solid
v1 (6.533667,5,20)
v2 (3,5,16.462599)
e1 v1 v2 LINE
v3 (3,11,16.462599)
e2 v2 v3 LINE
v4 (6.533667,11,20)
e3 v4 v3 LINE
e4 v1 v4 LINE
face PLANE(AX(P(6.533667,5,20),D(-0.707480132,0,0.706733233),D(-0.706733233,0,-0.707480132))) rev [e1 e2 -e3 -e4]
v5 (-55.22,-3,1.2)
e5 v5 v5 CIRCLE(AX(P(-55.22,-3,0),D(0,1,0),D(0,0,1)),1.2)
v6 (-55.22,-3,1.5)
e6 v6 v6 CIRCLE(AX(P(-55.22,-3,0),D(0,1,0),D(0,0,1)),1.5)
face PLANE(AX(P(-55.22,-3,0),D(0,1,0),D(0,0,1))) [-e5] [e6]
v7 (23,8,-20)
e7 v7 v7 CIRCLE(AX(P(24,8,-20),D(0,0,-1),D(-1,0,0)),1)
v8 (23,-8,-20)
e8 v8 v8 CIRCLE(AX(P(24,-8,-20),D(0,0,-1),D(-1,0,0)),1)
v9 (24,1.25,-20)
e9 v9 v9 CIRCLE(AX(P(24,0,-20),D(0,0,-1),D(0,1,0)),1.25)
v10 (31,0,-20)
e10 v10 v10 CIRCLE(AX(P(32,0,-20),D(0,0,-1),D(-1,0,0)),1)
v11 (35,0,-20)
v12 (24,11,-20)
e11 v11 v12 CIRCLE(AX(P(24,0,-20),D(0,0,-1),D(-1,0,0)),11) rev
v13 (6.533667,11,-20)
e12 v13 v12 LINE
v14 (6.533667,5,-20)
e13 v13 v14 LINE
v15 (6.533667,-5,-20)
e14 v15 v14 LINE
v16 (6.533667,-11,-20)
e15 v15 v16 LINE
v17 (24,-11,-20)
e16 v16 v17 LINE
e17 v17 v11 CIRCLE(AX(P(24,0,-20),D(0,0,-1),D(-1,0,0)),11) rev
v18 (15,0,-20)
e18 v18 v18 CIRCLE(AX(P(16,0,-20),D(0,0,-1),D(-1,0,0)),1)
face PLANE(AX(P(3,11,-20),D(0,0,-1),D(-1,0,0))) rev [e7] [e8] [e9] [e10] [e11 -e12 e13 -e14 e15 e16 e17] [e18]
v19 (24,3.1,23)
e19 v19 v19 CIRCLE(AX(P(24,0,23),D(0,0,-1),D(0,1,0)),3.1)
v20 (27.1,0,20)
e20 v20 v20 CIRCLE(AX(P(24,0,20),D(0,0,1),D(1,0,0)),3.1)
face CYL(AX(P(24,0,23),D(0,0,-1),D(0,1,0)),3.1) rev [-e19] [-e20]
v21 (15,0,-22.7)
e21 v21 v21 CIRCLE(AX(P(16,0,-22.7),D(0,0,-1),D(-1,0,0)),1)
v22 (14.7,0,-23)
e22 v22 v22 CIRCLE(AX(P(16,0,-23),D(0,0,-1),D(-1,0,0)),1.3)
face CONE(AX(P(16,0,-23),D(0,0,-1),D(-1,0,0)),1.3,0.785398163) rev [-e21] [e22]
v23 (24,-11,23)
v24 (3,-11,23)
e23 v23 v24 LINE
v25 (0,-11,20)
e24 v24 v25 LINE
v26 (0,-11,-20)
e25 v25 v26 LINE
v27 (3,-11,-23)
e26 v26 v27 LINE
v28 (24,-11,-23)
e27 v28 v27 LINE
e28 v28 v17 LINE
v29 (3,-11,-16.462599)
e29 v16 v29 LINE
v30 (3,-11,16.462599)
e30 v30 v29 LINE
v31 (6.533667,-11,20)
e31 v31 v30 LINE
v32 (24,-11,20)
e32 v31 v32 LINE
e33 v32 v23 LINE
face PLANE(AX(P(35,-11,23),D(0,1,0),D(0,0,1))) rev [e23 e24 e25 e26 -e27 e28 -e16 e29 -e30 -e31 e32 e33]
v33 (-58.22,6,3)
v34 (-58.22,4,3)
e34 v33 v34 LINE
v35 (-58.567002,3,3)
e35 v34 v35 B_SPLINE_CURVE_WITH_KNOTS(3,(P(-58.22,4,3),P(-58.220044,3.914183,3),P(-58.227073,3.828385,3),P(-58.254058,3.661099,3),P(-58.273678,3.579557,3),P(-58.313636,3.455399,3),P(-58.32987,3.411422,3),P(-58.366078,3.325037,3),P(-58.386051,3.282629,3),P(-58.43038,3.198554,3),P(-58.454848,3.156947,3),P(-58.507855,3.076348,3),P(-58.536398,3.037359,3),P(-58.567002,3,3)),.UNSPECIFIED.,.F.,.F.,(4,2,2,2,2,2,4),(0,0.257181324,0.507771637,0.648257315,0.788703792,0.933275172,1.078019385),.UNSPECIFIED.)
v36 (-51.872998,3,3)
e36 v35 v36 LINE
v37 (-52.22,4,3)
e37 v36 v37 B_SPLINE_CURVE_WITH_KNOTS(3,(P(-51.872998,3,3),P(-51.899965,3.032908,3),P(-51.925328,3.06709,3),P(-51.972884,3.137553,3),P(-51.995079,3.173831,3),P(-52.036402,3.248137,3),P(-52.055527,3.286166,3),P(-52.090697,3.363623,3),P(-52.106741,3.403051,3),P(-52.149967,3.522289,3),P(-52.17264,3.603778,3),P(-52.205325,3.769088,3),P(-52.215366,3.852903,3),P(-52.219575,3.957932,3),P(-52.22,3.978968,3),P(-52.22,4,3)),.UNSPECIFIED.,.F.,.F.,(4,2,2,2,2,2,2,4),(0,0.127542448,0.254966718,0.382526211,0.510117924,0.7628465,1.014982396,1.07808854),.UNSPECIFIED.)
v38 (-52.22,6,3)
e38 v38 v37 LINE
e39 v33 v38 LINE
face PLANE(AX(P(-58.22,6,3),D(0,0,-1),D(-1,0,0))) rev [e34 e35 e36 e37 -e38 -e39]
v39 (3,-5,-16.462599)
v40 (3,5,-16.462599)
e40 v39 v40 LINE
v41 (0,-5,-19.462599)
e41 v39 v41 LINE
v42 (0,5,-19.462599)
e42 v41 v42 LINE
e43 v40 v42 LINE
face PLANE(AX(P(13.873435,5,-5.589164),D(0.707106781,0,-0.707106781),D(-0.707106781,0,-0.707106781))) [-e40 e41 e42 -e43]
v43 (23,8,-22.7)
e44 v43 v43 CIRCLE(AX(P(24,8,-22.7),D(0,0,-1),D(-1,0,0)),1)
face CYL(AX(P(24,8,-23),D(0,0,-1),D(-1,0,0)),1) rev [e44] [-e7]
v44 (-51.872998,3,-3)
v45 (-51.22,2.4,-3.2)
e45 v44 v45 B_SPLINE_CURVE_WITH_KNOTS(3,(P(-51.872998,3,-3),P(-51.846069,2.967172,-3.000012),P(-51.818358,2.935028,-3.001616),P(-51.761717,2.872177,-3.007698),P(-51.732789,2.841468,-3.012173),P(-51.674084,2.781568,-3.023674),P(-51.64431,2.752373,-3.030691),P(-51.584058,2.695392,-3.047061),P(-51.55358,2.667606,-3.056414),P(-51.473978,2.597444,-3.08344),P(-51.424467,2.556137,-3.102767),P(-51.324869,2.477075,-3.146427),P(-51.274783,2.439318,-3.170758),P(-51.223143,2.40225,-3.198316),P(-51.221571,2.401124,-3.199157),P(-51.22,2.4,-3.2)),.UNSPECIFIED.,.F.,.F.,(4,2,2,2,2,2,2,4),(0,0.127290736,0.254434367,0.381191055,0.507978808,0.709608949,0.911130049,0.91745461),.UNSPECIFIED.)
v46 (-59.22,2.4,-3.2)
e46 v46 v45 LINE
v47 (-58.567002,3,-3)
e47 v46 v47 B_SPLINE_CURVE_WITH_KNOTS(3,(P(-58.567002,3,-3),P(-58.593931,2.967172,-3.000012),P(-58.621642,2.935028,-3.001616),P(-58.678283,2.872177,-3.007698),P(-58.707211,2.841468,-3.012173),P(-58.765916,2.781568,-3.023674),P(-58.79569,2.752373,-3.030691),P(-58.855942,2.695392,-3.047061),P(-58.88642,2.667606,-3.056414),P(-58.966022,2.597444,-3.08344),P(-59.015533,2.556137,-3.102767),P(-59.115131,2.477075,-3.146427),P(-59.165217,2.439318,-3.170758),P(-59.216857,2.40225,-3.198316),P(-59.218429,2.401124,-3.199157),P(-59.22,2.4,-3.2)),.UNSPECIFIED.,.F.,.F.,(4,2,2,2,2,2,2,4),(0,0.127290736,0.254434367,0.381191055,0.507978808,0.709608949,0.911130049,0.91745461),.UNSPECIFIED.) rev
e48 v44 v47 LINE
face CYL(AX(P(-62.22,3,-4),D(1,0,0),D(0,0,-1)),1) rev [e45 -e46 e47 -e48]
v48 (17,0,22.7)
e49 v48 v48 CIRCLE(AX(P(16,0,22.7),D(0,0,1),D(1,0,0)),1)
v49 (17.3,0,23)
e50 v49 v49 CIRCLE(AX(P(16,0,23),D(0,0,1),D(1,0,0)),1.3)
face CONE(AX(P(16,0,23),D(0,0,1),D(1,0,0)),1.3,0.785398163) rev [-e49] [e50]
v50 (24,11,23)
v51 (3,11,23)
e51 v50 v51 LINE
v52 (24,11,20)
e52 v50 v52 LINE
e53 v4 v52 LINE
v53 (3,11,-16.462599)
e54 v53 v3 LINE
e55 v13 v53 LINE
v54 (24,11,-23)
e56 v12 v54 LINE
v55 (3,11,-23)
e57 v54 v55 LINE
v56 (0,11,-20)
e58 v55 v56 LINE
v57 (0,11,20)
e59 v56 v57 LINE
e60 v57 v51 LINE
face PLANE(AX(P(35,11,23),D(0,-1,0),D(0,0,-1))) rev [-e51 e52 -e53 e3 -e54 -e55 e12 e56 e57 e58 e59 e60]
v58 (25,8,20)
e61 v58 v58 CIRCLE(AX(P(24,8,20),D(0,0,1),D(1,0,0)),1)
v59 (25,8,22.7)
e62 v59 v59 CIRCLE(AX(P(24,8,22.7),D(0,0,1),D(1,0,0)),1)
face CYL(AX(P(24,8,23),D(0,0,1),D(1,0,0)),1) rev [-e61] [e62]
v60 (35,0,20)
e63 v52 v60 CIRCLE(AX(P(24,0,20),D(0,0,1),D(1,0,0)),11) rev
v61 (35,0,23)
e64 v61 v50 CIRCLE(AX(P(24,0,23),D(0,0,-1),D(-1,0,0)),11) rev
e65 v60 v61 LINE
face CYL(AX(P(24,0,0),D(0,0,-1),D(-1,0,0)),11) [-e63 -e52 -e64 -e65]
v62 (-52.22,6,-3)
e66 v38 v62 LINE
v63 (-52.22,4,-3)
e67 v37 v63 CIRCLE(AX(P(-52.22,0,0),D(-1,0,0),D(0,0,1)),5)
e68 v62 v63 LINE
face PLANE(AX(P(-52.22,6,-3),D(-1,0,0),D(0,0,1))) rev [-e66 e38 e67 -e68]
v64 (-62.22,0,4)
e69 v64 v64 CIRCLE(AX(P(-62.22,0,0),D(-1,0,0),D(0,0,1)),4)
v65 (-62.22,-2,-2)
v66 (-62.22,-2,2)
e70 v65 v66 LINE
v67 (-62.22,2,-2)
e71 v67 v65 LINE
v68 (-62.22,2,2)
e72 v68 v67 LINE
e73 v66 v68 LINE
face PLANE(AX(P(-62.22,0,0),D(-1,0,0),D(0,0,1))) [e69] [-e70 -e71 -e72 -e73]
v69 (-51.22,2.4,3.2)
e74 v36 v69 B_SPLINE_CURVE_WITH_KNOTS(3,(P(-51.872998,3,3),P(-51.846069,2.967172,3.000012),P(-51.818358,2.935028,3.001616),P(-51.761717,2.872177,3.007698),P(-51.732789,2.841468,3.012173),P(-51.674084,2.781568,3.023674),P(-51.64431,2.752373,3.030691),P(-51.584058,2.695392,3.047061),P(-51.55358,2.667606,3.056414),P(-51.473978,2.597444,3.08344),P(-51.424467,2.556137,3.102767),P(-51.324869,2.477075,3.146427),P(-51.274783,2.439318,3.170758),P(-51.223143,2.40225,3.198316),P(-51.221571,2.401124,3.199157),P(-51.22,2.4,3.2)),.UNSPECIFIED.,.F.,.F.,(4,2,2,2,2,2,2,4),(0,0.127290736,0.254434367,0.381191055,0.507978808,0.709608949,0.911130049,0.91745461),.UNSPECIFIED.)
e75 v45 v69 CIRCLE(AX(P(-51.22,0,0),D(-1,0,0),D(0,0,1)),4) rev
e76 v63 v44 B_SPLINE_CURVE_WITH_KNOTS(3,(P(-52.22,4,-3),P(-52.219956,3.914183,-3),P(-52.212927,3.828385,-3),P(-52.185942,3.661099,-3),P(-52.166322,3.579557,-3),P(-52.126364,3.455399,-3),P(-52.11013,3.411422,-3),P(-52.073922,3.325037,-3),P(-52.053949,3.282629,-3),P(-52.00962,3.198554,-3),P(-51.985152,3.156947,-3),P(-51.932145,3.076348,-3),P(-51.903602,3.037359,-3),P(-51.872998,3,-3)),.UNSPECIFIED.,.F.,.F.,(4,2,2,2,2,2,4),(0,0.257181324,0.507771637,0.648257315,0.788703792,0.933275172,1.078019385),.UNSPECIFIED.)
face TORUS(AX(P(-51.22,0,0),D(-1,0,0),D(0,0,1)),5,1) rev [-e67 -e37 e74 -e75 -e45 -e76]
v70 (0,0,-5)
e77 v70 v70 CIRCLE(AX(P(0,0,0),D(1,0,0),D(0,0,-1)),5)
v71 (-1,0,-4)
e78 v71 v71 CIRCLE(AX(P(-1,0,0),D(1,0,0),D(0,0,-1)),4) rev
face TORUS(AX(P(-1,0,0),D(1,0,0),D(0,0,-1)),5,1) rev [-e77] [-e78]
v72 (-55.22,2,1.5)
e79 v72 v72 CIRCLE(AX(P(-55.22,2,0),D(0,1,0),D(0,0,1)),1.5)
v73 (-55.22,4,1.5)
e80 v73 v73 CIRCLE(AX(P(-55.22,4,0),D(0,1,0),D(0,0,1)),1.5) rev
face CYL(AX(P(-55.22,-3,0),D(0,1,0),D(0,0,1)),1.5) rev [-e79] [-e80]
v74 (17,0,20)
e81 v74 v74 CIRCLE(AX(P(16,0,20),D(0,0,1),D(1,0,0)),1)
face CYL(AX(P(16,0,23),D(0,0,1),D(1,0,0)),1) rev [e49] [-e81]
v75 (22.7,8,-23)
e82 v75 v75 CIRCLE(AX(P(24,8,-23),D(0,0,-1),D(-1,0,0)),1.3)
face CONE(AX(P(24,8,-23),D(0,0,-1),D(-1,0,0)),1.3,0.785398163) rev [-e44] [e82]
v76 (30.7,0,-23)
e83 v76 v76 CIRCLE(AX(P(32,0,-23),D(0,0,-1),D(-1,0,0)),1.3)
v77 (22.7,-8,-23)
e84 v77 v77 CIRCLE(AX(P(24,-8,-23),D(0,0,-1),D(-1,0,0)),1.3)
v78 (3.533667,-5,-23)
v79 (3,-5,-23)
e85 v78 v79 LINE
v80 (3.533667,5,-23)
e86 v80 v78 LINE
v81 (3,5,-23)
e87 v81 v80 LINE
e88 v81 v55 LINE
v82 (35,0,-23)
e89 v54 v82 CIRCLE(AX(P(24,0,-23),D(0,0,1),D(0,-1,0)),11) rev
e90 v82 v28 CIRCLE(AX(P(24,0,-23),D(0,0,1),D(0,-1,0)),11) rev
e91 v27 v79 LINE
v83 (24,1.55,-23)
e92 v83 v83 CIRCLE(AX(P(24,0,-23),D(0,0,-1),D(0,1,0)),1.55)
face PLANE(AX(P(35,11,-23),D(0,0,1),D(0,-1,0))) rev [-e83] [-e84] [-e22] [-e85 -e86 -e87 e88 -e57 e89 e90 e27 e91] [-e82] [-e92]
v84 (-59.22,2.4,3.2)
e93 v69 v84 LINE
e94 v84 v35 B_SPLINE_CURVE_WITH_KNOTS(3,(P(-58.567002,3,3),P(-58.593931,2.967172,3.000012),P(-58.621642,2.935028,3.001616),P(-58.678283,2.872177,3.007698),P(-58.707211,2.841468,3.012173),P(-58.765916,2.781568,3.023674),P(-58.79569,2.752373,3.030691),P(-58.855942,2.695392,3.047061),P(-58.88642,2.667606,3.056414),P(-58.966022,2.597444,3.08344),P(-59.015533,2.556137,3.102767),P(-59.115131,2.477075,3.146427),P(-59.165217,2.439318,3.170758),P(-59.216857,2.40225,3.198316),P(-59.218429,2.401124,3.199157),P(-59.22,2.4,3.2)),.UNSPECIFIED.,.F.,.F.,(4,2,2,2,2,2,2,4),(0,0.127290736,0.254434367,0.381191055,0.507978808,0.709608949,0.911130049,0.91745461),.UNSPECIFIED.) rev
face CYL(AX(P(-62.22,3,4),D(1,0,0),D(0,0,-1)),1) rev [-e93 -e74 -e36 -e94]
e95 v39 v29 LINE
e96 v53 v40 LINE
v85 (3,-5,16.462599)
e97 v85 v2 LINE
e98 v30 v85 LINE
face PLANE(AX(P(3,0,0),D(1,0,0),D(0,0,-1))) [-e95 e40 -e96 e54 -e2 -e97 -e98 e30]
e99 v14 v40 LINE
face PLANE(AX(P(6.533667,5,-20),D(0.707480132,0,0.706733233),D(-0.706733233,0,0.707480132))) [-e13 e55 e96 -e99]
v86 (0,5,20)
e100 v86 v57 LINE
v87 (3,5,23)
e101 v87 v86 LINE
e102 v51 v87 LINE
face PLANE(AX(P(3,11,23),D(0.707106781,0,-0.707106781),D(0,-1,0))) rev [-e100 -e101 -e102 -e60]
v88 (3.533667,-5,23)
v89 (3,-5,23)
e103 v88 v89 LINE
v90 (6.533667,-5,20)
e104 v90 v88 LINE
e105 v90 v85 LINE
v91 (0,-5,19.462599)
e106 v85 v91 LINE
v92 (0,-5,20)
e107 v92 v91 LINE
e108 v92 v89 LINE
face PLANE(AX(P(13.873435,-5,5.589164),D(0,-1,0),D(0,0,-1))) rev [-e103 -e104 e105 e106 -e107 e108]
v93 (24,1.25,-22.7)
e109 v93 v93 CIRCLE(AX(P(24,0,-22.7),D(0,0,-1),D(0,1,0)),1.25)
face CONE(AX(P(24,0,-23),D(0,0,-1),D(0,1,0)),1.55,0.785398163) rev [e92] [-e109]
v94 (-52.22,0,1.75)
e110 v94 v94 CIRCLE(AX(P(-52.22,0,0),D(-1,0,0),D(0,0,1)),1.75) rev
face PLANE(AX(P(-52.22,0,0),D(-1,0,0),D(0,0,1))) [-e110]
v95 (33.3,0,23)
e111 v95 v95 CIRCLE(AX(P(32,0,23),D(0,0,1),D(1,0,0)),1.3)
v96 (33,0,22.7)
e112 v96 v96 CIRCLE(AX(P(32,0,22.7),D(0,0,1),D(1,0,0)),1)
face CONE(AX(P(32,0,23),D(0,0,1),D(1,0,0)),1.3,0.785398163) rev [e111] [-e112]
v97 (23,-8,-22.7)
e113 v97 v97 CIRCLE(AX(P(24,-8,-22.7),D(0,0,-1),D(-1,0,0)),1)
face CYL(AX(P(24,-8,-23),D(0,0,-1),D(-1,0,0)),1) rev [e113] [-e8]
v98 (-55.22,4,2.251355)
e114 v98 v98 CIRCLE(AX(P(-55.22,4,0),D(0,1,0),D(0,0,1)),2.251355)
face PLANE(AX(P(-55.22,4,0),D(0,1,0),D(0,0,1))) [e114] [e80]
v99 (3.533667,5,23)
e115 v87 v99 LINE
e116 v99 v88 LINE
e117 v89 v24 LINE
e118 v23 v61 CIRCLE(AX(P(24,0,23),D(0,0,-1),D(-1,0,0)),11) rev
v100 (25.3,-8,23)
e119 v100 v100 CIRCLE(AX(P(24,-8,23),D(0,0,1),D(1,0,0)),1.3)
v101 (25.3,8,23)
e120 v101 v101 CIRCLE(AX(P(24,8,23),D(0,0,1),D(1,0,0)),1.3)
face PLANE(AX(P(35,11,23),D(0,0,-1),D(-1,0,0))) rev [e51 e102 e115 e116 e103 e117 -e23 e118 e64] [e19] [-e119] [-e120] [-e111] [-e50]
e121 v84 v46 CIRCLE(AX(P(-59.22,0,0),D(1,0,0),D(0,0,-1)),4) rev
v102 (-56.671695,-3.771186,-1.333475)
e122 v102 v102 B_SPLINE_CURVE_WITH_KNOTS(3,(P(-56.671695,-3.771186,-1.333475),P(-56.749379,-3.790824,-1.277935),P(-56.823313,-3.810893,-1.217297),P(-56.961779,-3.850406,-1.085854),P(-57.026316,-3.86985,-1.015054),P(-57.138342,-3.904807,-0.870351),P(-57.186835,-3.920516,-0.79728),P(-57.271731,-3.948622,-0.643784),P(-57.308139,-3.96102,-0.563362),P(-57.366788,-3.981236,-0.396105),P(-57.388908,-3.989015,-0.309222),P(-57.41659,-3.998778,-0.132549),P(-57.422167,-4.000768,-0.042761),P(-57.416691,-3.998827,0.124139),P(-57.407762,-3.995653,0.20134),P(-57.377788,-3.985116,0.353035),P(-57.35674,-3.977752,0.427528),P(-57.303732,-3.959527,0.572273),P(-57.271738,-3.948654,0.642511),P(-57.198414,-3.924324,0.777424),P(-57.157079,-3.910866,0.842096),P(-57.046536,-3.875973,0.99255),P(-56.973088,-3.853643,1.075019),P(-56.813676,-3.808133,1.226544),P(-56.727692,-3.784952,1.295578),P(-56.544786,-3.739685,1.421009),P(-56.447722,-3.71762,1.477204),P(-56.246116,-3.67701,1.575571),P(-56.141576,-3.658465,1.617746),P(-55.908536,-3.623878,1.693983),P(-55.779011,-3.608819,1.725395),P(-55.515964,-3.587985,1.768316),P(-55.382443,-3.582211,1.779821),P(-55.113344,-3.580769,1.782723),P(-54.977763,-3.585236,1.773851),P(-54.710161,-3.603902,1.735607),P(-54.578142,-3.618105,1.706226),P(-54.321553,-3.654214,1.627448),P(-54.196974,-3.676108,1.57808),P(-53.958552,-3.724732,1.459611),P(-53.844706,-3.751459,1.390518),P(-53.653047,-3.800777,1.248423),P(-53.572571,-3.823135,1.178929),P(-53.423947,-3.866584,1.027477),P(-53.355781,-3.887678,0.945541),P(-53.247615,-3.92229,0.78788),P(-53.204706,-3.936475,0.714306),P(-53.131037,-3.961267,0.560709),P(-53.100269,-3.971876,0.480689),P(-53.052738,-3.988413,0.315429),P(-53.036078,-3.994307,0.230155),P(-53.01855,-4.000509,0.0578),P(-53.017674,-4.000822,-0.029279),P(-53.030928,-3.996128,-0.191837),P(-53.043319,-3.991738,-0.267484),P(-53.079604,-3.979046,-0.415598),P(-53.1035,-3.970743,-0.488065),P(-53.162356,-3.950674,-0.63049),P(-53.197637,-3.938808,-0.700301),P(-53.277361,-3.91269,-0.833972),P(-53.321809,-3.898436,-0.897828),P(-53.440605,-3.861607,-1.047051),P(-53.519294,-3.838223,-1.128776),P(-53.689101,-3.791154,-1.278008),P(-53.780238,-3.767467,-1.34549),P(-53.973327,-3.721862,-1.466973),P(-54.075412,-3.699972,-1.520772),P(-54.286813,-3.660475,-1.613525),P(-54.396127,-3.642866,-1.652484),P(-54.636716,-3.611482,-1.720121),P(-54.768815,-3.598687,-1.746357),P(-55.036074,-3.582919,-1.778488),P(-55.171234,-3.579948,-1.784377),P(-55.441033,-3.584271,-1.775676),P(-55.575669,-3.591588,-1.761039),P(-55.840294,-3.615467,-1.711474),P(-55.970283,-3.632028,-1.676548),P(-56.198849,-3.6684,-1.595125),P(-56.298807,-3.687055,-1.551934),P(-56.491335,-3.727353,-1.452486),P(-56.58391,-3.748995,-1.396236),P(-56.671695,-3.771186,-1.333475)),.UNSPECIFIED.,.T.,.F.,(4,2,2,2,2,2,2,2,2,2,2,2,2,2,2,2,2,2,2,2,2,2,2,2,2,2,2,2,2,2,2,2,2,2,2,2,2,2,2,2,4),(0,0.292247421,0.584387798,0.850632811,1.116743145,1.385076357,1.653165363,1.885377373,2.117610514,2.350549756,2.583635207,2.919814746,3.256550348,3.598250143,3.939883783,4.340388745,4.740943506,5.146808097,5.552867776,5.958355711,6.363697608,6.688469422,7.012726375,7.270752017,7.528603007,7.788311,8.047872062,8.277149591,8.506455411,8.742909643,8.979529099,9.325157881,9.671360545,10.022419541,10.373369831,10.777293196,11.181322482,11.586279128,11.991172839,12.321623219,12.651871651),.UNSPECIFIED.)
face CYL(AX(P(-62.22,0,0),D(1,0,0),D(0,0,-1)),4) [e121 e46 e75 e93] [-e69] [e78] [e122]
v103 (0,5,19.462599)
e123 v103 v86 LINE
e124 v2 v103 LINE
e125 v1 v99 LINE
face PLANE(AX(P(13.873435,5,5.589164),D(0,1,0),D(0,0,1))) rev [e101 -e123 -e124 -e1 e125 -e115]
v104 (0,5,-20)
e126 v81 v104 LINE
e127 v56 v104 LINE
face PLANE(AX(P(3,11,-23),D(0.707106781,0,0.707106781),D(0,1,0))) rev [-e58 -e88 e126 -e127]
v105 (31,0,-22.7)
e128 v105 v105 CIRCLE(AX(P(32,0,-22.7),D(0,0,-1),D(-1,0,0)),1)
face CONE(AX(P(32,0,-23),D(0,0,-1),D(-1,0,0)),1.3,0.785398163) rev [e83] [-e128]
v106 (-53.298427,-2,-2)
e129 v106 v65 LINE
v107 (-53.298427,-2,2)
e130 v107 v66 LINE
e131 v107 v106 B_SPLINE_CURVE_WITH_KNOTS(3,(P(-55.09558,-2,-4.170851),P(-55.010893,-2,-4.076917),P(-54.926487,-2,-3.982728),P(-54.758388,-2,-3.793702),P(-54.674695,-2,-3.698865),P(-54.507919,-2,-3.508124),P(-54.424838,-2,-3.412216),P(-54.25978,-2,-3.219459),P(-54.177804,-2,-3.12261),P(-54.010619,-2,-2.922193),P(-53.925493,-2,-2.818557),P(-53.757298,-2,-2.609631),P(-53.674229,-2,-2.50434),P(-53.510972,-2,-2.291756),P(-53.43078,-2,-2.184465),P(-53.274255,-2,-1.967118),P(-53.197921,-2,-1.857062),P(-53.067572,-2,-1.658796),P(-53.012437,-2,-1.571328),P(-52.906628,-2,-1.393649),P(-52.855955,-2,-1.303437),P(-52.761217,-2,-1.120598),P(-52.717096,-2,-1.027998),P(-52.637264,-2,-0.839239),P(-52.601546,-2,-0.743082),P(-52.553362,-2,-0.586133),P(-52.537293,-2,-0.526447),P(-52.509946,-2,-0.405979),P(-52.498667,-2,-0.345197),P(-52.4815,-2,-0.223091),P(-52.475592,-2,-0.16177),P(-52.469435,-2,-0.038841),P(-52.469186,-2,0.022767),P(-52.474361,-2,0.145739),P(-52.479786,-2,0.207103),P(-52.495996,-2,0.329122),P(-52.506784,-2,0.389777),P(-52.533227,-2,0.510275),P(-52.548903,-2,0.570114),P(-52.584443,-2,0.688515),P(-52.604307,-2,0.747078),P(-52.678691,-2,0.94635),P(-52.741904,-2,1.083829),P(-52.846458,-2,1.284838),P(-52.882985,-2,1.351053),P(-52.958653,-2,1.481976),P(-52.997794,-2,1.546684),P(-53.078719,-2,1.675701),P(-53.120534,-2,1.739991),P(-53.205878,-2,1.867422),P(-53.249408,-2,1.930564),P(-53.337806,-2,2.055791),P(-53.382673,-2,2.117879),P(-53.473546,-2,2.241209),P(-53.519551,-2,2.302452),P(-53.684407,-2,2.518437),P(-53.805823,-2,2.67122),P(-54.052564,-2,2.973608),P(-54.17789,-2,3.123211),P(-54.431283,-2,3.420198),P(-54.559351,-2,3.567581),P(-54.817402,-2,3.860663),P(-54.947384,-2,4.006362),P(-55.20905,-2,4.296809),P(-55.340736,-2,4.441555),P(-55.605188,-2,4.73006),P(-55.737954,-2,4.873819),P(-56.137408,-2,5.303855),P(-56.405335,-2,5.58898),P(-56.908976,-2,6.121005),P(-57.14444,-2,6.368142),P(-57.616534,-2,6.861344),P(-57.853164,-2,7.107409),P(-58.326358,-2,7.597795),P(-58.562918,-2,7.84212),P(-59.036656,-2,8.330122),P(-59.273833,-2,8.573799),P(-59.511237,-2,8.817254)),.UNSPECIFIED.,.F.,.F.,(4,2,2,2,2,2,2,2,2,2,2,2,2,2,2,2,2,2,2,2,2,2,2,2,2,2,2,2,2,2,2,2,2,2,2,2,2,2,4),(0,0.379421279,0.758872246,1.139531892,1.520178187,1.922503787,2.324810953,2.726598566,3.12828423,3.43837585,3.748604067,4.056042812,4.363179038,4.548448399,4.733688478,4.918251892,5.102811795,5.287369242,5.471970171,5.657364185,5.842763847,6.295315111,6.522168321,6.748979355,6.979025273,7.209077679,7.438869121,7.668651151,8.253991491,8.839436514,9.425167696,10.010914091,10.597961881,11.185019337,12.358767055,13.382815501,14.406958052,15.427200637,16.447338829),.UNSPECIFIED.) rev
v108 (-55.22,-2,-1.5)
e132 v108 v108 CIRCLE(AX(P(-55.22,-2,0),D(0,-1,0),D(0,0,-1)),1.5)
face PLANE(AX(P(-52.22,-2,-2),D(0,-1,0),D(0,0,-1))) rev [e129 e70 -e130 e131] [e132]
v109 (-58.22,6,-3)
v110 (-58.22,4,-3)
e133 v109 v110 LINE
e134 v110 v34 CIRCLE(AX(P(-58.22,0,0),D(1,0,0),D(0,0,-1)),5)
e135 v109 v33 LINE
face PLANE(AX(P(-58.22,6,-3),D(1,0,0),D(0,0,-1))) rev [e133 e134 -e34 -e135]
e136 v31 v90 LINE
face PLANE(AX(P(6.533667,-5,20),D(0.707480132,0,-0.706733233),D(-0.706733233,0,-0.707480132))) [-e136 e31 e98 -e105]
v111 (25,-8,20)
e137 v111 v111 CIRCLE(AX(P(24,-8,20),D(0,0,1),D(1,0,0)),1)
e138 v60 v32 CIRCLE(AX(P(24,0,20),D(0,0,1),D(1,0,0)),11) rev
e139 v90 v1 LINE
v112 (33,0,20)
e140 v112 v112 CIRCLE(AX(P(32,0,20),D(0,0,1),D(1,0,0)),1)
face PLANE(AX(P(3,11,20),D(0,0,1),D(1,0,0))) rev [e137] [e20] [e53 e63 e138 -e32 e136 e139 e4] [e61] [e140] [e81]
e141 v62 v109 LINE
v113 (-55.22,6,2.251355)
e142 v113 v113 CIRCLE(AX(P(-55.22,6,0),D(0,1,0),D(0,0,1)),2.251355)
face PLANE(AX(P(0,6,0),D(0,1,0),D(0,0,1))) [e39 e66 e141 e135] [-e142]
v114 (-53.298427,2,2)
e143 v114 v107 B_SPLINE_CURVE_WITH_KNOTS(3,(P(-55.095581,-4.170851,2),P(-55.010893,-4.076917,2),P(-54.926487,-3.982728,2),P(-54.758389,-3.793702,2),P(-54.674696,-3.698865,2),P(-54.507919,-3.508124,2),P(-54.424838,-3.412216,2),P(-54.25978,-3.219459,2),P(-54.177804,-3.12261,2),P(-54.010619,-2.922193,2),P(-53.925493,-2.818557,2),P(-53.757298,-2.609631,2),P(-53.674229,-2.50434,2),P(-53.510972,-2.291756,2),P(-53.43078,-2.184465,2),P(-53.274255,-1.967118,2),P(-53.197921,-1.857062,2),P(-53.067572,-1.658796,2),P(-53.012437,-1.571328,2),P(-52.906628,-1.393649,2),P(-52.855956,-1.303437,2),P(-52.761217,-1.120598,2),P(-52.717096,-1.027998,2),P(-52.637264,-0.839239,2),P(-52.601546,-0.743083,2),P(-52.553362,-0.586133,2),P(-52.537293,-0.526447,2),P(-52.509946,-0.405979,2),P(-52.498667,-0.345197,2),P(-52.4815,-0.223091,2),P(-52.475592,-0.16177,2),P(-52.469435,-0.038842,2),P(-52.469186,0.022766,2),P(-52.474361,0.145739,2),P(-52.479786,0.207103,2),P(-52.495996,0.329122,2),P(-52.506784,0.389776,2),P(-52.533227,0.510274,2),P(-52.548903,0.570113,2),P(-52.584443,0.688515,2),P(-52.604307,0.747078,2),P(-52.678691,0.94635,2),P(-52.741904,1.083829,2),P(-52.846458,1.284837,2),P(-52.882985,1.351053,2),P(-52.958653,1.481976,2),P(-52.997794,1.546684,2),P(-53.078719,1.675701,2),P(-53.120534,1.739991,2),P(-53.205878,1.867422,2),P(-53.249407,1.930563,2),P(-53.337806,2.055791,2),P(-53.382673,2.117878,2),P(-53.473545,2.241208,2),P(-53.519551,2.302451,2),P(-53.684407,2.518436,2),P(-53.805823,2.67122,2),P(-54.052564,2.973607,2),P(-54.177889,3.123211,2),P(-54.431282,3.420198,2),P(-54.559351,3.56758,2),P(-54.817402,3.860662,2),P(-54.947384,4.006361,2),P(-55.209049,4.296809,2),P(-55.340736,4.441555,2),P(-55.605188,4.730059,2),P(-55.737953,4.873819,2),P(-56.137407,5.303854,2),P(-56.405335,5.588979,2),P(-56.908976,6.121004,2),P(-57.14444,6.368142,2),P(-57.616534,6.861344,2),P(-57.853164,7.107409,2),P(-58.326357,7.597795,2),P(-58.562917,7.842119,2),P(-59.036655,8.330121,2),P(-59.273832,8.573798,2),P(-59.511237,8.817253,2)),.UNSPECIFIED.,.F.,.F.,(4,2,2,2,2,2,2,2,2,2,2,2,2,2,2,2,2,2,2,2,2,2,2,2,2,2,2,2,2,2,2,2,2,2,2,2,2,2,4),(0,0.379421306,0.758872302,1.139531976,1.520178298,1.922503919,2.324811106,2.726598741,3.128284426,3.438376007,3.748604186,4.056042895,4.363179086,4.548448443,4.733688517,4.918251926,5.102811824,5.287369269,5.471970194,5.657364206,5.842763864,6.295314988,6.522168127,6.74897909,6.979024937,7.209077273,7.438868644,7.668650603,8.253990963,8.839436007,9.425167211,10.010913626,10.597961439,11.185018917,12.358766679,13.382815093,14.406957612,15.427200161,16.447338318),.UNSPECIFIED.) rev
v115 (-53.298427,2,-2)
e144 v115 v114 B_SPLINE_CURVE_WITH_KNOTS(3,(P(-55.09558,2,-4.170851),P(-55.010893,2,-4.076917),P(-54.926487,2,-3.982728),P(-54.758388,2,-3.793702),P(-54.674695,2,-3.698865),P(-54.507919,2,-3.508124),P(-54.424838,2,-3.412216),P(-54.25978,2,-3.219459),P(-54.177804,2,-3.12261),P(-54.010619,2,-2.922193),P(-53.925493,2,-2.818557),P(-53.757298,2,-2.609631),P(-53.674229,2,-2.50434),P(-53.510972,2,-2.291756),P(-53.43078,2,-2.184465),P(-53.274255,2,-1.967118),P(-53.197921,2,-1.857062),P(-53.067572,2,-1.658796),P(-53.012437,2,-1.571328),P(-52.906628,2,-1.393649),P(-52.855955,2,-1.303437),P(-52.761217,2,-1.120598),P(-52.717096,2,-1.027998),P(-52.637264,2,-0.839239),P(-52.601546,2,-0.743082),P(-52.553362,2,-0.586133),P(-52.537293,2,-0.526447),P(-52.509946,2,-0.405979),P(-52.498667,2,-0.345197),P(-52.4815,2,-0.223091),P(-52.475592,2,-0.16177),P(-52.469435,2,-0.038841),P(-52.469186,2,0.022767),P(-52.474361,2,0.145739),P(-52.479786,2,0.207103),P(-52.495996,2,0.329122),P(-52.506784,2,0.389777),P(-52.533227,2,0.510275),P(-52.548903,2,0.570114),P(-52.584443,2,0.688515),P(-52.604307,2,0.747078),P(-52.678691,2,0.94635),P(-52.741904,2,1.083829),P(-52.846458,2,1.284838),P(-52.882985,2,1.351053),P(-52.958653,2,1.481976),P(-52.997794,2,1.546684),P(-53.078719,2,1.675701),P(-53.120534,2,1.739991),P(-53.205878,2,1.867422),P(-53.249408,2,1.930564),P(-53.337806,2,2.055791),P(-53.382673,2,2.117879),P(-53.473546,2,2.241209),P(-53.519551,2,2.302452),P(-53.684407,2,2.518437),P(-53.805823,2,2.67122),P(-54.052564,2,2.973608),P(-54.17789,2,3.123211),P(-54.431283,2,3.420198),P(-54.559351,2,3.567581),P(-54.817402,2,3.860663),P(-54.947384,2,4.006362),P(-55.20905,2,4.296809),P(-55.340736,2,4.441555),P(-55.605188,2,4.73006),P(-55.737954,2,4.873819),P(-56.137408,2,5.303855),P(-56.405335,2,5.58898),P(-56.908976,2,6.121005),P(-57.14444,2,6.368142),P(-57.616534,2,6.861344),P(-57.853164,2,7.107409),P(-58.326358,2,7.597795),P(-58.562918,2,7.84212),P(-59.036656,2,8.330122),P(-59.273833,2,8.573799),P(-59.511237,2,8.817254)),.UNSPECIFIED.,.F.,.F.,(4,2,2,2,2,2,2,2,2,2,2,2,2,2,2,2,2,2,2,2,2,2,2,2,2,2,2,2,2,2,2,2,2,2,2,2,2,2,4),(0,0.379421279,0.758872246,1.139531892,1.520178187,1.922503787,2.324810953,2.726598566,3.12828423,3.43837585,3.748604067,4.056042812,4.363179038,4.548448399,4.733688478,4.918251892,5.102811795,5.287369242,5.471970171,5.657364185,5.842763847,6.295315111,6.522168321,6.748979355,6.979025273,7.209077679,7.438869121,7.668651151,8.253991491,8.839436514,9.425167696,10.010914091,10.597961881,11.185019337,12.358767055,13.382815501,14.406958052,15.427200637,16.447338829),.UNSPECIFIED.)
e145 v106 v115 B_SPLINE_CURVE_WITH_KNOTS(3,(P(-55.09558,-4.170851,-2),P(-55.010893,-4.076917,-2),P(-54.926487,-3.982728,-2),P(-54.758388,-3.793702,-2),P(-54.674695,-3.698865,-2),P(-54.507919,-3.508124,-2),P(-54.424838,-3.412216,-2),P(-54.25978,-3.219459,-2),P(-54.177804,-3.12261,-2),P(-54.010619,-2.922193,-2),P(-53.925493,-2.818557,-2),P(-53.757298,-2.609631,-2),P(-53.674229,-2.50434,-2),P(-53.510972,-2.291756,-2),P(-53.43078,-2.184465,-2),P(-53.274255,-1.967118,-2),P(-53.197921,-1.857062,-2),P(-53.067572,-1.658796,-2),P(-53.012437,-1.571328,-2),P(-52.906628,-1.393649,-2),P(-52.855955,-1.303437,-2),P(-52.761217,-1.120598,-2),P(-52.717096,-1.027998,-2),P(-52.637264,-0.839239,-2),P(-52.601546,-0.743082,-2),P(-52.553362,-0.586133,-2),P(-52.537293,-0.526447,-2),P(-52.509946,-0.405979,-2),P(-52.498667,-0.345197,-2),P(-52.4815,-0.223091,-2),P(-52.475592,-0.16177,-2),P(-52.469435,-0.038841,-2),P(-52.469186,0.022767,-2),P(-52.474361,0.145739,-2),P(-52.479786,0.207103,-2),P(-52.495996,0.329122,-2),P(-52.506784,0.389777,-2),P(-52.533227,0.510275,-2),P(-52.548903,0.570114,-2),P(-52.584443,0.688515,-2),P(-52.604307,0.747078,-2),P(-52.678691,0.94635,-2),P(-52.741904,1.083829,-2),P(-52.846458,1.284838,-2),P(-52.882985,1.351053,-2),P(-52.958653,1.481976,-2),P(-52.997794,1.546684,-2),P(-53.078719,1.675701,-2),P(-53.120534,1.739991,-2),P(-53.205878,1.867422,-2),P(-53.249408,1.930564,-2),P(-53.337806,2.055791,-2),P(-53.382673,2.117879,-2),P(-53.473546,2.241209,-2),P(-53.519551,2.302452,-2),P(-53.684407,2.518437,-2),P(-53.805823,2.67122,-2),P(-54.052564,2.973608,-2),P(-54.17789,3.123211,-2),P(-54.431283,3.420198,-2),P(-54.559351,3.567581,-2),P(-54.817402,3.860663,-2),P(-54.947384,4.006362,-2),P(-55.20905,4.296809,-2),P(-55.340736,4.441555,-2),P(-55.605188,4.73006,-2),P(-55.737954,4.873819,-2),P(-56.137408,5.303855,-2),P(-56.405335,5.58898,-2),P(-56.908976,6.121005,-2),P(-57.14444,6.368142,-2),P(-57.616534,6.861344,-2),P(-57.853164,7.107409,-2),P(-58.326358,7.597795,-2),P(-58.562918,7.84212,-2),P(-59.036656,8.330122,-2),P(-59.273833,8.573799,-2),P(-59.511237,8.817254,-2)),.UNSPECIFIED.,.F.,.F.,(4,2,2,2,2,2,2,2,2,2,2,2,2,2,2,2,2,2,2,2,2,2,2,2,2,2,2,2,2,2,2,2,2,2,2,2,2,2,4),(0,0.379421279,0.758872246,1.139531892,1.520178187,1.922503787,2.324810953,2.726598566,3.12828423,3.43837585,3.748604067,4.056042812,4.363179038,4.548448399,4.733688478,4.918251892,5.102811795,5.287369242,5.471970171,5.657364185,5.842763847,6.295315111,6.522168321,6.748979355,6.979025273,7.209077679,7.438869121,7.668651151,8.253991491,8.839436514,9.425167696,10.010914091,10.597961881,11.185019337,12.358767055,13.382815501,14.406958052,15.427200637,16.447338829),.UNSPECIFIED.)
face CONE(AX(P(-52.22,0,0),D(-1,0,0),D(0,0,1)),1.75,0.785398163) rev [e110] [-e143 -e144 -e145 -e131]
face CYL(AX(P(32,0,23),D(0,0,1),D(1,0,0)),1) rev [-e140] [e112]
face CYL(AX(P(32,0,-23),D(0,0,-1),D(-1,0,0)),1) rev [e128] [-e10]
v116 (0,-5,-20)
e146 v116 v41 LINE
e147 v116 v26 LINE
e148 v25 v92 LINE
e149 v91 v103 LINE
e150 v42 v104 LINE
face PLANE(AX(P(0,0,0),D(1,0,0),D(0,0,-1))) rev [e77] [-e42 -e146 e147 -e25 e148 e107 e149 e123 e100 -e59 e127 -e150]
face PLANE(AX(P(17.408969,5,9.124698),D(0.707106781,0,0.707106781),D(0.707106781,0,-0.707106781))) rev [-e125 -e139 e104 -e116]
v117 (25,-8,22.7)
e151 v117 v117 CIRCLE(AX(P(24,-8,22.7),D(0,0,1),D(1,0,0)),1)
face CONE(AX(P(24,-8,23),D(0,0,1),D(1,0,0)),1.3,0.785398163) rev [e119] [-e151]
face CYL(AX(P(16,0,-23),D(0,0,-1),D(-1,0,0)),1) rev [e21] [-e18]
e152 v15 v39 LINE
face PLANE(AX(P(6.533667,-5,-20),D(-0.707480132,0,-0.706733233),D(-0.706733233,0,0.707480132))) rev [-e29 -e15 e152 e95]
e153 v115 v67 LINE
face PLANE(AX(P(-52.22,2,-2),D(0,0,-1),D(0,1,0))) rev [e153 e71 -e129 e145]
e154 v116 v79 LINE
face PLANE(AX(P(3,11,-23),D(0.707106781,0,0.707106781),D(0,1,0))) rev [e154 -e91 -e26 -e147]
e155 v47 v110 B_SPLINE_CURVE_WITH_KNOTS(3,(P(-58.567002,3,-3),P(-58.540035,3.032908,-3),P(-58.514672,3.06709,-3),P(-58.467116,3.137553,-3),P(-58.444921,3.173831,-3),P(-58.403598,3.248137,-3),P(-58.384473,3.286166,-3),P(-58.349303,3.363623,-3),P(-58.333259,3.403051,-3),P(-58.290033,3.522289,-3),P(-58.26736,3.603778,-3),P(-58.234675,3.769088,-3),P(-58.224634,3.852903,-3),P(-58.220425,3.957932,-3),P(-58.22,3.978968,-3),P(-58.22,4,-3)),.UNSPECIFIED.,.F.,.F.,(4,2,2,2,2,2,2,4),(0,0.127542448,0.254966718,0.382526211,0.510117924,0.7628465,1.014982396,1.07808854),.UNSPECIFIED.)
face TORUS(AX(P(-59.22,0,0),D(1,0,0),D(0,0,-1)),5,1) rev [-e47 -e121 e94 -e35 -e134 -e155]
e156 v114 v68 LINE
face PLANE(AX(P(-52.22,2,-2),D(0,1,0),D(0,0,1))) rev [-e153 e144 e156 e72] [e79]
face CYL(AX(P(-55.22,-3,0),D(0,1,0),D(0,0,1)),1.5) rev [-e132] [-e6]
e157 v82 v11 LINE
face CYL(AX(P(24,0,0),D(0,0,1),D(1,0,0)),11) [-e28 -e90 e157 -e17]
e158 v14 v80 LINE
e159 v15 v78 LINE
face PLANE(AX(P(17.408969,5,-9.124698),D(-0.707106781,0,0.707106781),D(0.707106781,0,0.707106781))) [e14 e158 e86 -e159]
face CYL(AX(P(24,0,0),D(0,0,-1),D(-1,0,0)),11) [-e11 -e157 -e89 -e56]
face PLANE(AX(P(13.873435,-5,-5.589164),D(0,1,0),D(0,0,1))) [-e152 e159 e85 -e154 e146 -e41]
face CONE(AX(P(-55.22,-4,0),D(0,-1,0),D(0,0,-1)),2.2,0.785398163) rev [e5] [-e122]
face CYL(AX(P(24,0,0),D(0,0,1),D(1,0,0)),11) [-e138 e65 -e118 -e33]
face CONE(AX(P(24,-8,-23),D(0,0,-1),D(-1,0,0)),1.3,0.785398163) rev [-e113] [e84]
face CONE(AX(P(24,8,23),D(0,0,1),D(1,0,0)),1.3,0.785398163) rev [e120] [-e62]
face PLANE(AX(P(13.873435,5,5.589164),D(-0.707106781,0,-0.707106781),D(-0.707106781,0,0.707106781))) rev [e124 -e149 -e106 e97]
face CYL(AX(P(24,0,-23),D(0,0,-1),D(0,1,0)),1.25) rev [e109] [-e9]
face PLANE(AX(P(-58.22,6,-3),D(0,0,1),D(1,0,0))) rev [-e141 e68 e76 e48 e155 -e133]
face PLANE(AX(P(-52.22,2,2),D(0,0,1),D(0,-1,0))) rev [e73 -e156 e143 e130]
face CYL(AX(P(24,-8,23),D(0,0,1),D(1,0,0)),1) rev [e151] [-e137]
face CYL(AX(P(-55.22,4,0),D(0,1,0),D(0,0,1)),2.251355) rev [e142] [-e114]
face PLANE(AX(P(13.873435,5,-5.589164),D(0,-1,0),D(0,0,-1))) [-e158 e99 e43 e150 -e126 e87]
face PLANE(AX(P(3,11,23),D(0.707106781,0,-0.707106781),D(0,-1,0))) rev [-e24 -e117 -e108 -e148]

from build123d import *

# Parameters (mm, degrees)
IZIM1_W                                        = 46
IZIM1_H                                        = 22
Y_KSEKLIK_EKSTR_ZYON1_DEPTH                    = 35
IZIM2_W                                        = 40
IZIM2_H                                        = 22
KES_EKSTR_ZYON1_DEPTH                          = 32
RADYUS1_R                                      = 11
PAH1_SIZE                                      = 3
IZIM3_W                                        = 5
IZIM3_H                                        = 10
KES_EKSTR_ZYON2_DEPTH                          = 20
FEDER5_REACH                                   = 46.833
IZIM8_WALL_W                                   = 96.666047784
IZIM8_WALL_H                                   = 6
AYNALAMA4_COPY_1_REACH                         = 46.833
AYNALAMA4_COPY_1_SKETCH_W                      = 96.666047784
AYNALAMA4_COPY_1_SKETCH_H                      = 6
IZIM10_R                                       = 3.1
KES_EKSTR_ZYON4_DEPTH                          = 59.838762733
IZIM12_R                                       = 3.1
Y_KSEKLIK_EKSTR_ZYON3_DEPTH                    = 3
M3_D_Z_BA_L_MAKINE_VIDAS_IN_HAV_A1_D           = 2.5
M3_D_Z_BA_L_MAKINE_VIDAS_IN_HAV_A1_CSINK_D     = 3.1
M3_D_Z_BA_L_MAKINE_VIDAS_IN_HAV_A1_CSINK_ANGLE = 90
IZIM18_R                                       = 4
Y_KSEKLIK_EKSTR_ZYON4_DEPTH                    = 62.22
IZIM19_W                                       = 4
IZIM19_H                                       = 4
KES_EKSTR_ZYON5_DEPTH                          = 10
RADYUS2_R                                      = 1
Y_KSEKLIK_EKSTR_ZYON5_DEPTH                    = 2
Y_KSEKLIK_EKSTR_ZYON5_DEPTH_BACK               = 2
IZIM21_W                                       = 6
IZIM21_H                                       = 6
IZIM22_R                                       = 1.5
KES_EKSTR_ZYON6_DEPTH                          = 9
IZIM23_R                                       = 2.251355404
KES_EKSTR_ZYON7_DEPTH                          = 2
RADYUS3_R                                      = 1
M2_D_Z_BA_L_MAKINE_VIDAS_IN_HAV_A2_D           = 2
M2_D_Z_BA_L_MAKINE_VIDAS_IN_HAV_A2_DEPTH       = 46
M2_D_Z_BA_L_MAKINE_VIDAS_IN_HAV_A2_CSINK_D     = 4.4
M2_D_Z_BA_L_MAKINE_VIDAS_IN_HAV_A2_CSINK_ANGLE = 90
M2_D_Z_BA_L_MAKINE_VIDAS_IN_HAV_A2_TIP         = 0.600860619


# Read off the part's stored shape, not the designer's step: M2 Düz Başlı Makine Vidası İçin Havşa1
with BuildPart() as part:
    # Çizim1 → Yükseklik-Ekstrüzyon1 (new body)
    with BuildSketch(Plane(origin=(0, 0, 0), x_dir=(0, 0, -1), z_dir=(1, 0, 0))):
        Rectangle(IZIM1_W, IZIM1_H)
    extrude(amount=Y_KSEKLIK_EKSTR_ZYON1_DEPTH)

    # Çizim2 → Kes-Ekstrüzyon1 (cut)
    with BuildSketch(Plane(origin=(35, 0, 0), x_dir=(0, 0, -1), z_dir=(1, 0, 0))):
        Rectangle(IZIM2_W, IZIM2_H)
    extrude(amount=-KES_EKSTR_ZYON1_DEPTH, mode=Mode.SUBTRACT)

    # Radyus1
    radyus1_edges = [part.edges().sort_by_distance(p)[0] for p in [
        (35, -11, 21.5),
        (35, 11, 21.5),
        (35, -11, -21.5),
        (35, 11, -21.5),
    ]]
    fillet(radyus1_edges, radius=RADYUS1_R - 0.0001)  # a hair under: the kernel refuses the full size

    # Pah1
    pah1_edges = [part.edges().sort_by_distance(p)[0] for p in [
        (0, 0, 23),
        (0, 0, -23),
    ]]
    chamfer(pah1_edges, length=PAH1_SIZE)

    # Çizim3 → Kes-Ekstrüzyon2 (cut)
    with BuildSketch(Plane(origin=(-10, 0, 10), x_dir=(0.7071067811865468, 0, 0.7071067811865483), z_dir=(-0.7071067811865483, 0, 0.7071067811865468))):
        with Locations((16.262135624, 0)):
            Rectangle(IZIM3_W, IZIM3_H)
    kes_ekstr_zyon2 = extrude(amount=-KES_EKSTR_ZYON2_DEPTH, mode=Mode.SUBTRACT)

    # M2 Düz Başlı Makine Vidası İçin Havşa1 ou → M2 Düz Başlı Makine Vidası İçin Havşa1 (revolve, cut)
    with BuildSketch(Plane(origin=(24, -8, 0), x_dir=(1, 0, 0), z_dir=(0, -1, 0))):
        Polygon((0, 20), (1, 20), (1, 22.7), (1.3, 23), (0, 23), align=None)
    m2_d_z_ba_l_makine_vidas_in_hav_a1 = revolve(axis=Axis((24, -8, 0), (0, 0, 1)), mode=Mode.SUBTRACT)

    # M2 D_z Ba_l_ Makine Vidas_ _in Hav_a 2 → M2 D_z Ba_l_ Makine Vidas_ _in Hav_a1 2 (revolve, cut)
    with BuildSketch(Plane(origin=(32, 0, 0), x_dir=(1, 0, 0), z_dir=(0, -1, 0))):
        Polygon((0, 20), (1, 20), (1, 22.7), (1.3, 23), (0, 23), align=None)
    m2_d_z_ba_l_makine_vidas_in_hav_a1_2 = revolve(axis=Axis((32, 0, 0), (0, 0, 1)), mode=Mode.SUBTRACT)

    # M2 D_z Ba_l_ Makine Vidas_ _in Hav_a 3 → M2 D_z Ba_l_ Makine Vidas_ _in Hav_a1 3 (revolve, cut)
    with BuildSketch(Plane(origin=(24, 8, 0), x_dir=(1, 0, 0), z_dir=(0, -1, 0))):
        Polygon((0, 20), (1, 20), (1, 22.7), (1.3, 23), (0, 23), align=None)
    m2_d_z_ba_l_makine_vidas_in_hav_a1_3 = revolve(axis=Axis((24, 8, 0), (0, 0, 1)), mode=Mode.SUBTRACT)

    # M2 D_z Ba_l_ Makine Vidas_ _in Hav_a 4 → M2 D_z Ba_l_ Makine Vidas_ _in Hav_a1 4 (revolve, cut)
    with BuildSketch(Plane(origin=(16, 0, 0), x_dir=(1, 0, 0), z_dir=(0, -1, 0))):
        Polygon((0, 20), (1, 20), (1, 22.7), (1.3, 23), (0, 23), align=None)
    m2_d_z_ba_l_makine_vidas_in_hav_a1_4 = revolve(axis=Axis((16, 0, 0), (0, 0, 1)), mode=Mode.SUBTRACT)

    # Aynalama2: Kes-Ekstrüzyon2, M2 Düz Başlı Makine Vidası İçin Havşa1, M2 D_z Ba_l_ Makine Vidas_ _in Hav_a1 2, M2 D_z Ba_l_ Makine Vidas_ _in Hav_a1 3, M2 D_z Ba_l_ Makine Vidas_ _in Hav_a1 4 across plane
    add(kes_ekstr_zyon2.mirror(Plane.XY), mode=Mode.SUBTRACT)
    add(m2_d_z_ba_l_makine_vidas_in_hav_a1.mirror(Plane.XY), mode=Mode.SUBTRACT)
    add(m2_d_z_ba_l_makine_vidas_in_hav_a1_2.mirror(Plane.XY), mode=Mode.SUBTRACT)
    add(m2_d_z_ba_l_makine_vidas_in_hav_a1_3.mirror(Plane.XY), mode=Mode.SUBTRACT)
    add(m2_d_z_ba_l_makine_vidas_in_hav_a1_4.mirror(Plane.XY), mode=Mode.SUBTRACT)

    # Çizim8 wall → Feder5 (add, up to next)
    with BuildSketch(Plane(origin=(4.766833329, -5, -18.231299423), x_dir=(-0.706733233022, 0, 0.707480132118), z_dir=(0.707480132118, 0, 0.706733233022)), mode=Mode.PRIVATE) as feder5_sk1:
        with Locations((0, 3)):
            Rectangle(IZIM8_WALL_W, IZIM8_WALL_H)
    feder5_tool1 = extrude(feder5_sk1.sketch, amount=-FEDER5_REACH, mode=Mode.PRIVATE) - part.part
    feder5 = feder5_tool1.solids().sort_by_distance((4.766833329, -5, -18.231299423))[0]
    add(feder5)

    # Aynalama3: Feder5 across plane
    add(feder5.mirror(Plane.ZX))

    # Aynalama4: Feder5 across plane
    add(feder5.mirror(Plane.XY))

    # Aynalama4 copy 1 sketch → Aynalama4 copy 1 (add, up to next)
    with BuildSketch(Plane(origin=(4.766833329, 5, 18.231299423), x_dir=(-0.706733233022, 0, -0.707480132118), z_dir=(0.707480132118, 0, -0.706733233022)), mode=Mode.PRIVATE) as aynalama4_copy_1_sk1:
        with Locations((0, 3)):
            Rectangle(AYNALAMA4_COPY_1_SKETCH_W, AYNALAMA4_COPY_1_SKETCH_H)
    aynalama4_copy_1_tool1 = extrude(aynalama4_copy_1_sk1.sketch, amount=-AYNALAMA4_COPY_1_REACH, mode=Mode.PRIVATE) - part.part
    add(aynalama4_copy_1_tool1.solids().sort_by_distance((4.766833329, 5, 18.231299423))[0])

    # Çizim10 → Kes-Ekstrüzyon4 (cut, through all)
    with BuildSketch(Plane(origin=(0, 0, -23), x_dir=(-1, 0, 0), z_dir=(0, 0, -1))):
        with Locations(Location((-24, 0, 0), (0, 0, 90))):
            Circle(IZIM10_R)
    extrude(amount=-KES_EKSTR_ZYON4_DEPTH, mode=Mode.SUBTRACT)

    # Çizim12 → Yükseklik-Ekstrüzyon3 (add)
    with BuildSketch(Plane(origin=(0, 0, -23), x_dir=(-1, 0, 0), z_dir=(0, 0, -1))):
        with Locations(Location((-24, 0, 0), (0, 0, 90))):
            Circle(IZIM12_R)
    extrude(amount=-Y_KSEKLIK_EKSTR_ZYON3_DEPTH)

    # M3 Düz Başlı Makine Vidası İçin Havşa1 (through all)
    with Locations(Plane(origin=(24, 0, -23), x_dir=(0, -1, 0), z_dir=(0, 0, -1))):
        with Locations((0, 0)):
            CounterSinkHole(M3_D_Z_BA_L_MAKINE_VIDAS_IN_HAV_A1_D / 2, M3_D_Z_BA_L_MAKINE_VIDAS_IN_HAV_A1_CSINK_D / 2, counter_sink_angle=M3_D_Z_BA_L_MAKINE_VIDAS_IN_HAV_A1_CSINK_ANGLE)

    # Çizim18 → Yükseklik-Ekstrüzyon4 (add)
    with BuildSketch(Plane.ZY):
        with Locations(Location((0, 0, 0), (0, 0, 180))):
            Circle(IZIM18_R)
    extrude(amount=Y_KSEKLIK_EKSTR_ZYON4_DEPTH)

    # Çizim19 → Kes-Ekstrüzyon5 (cut)
    with BuildSketch(Plane.ZY.offset(62.22)):
        Rectangle(IZIM19_W, IZIM19_H)
    extrude(amount=-KES_EKSTR_ZYON5_DEPTH, mode=Mode.SUBTRACT)

    # Çizim20 → Döndür1 (revolve)
    with BuildSketch(Plane.XY, mode=Mode.PRIVATE) as d_nd_r1_sk:
        Polygon((-52.22, -1.75), (-52.22, -3.5), (-53.97, -3.5), align=None)
    revolve(d_nd_r1_sk.sketch.rotate(Axis((-62.22, 0, 0), (1, 0, 0)), 270), axis=Axis((-62.22, 0, 0), (1, 0, 0)))

    # Radyus2
    radyus2_edges = [part.edges().sort_by_distance(p)[0] for p in [
        (0, 0, 4),
    ]]
    fillet(radyus2_edges, radius=RADYUS2_R)

    # Çizim21 → Yükseklik-Ekstrüzyon5 (add, two sides: drawn at the far end of the back side and taken through both)
    with BuildSketch(Plane(origin=(0, 4, 0), x_dir=(1, 0, 0), z_dir=(0, 1, 0)).offset(-Y_KSEKLIK_EKSTR_ZYON5_DEPTH_BACK)):
        with Locations((-55.22, 0)):
            Rectangle(IZIM21_W, IZIM21_H)
    extrude(amount=Y_KSEKLIK_EKSTR_ZYON5_DEPTH + Y_KSEKLIK_EKSTR_ZYON5_DEPTH_BACK)

    # Çizim22 → Kes-Ekstrüzyon6 (cut)
    with BuildSketch(Plane(origin=(0, 6, 0), x_dir=(1, 0, 0), z_dir=(0, 1, 0))):
        with Locations(Location((-55.22, 0, 0), (0, 0, 270))):
            Circle(IZIM22_R)
    extrude(amount=-KES_EKSTR_ZYON6_DEPTH, mode=Mode.SUBTRACT)

    # Çizim23 → Kes-Ekstrüzyon7 (cut)
    with BuildSketch(Plane(origin=(0, 6, 0), x_dir=(1, 0, 0), z_dir=(0, 1, 0))):
        with Locations(Location((-55.22, 0, 0), (0, 0, 270))):
            Circle(IZIM23_R)
    extrude(amount=-KES_EKSTR_ZYON7_DEPTH, mode=Mode.SUBTRACT)

    # Radyus3
    radyus3_edges = [part.edges().sort_by_distance(p)[0] for p in [
        (-55.22, 2.645751311, 3),
        (-55.22, 2.645751311, -3),
        (-52.22, 4, 0),
        (-58.22, 4, 0),
    ]]
    fillet(radyus3_edges, radius=RADYUS3_R)

    # M2 Düz Başlı Makine Vidası İçin Havşa2
    with Locations(Plane.XZ.offset(4)):
        with Locations((-55.22, 0)):
            CounterSinkHole(M2_D_Z_BA_L_MAKINE_VIDAS_IN_HAV_A2_D / 2, M2_D_Z_BA_L_MAKINE_VIDAS_IN_HAV_A2_CSINK_D / 2, depth=M2_D_Z_BA_L_MAKINE_VIDAS_IN_HAV_A2_DEPTH, counter_sink_angle=M2_D_Z_BA_L_MAKINE_VIDAS_IN_HAV_A2_CSINK_ANGLE)
            with Locations((0, 0, -(M2_D_Z_BA_L_MAKINE_VIDAS_IN_HAV_A2_DEPTH + M2_D_Z_BA_L_MAKINE_VIDAS_IN_HAV_A2_TIP / 2))):  # 118° drill point
                Cone(0, M2_D_Z_BA_L_MAKINE_VIDAS_IN_HAV_A2_D / 2, M2_D_Z_BA_L_MAKINE_VIDAS_IN_HAV_A2_TIP, mode=Mode.SUBTRACT)


solid = part.part
